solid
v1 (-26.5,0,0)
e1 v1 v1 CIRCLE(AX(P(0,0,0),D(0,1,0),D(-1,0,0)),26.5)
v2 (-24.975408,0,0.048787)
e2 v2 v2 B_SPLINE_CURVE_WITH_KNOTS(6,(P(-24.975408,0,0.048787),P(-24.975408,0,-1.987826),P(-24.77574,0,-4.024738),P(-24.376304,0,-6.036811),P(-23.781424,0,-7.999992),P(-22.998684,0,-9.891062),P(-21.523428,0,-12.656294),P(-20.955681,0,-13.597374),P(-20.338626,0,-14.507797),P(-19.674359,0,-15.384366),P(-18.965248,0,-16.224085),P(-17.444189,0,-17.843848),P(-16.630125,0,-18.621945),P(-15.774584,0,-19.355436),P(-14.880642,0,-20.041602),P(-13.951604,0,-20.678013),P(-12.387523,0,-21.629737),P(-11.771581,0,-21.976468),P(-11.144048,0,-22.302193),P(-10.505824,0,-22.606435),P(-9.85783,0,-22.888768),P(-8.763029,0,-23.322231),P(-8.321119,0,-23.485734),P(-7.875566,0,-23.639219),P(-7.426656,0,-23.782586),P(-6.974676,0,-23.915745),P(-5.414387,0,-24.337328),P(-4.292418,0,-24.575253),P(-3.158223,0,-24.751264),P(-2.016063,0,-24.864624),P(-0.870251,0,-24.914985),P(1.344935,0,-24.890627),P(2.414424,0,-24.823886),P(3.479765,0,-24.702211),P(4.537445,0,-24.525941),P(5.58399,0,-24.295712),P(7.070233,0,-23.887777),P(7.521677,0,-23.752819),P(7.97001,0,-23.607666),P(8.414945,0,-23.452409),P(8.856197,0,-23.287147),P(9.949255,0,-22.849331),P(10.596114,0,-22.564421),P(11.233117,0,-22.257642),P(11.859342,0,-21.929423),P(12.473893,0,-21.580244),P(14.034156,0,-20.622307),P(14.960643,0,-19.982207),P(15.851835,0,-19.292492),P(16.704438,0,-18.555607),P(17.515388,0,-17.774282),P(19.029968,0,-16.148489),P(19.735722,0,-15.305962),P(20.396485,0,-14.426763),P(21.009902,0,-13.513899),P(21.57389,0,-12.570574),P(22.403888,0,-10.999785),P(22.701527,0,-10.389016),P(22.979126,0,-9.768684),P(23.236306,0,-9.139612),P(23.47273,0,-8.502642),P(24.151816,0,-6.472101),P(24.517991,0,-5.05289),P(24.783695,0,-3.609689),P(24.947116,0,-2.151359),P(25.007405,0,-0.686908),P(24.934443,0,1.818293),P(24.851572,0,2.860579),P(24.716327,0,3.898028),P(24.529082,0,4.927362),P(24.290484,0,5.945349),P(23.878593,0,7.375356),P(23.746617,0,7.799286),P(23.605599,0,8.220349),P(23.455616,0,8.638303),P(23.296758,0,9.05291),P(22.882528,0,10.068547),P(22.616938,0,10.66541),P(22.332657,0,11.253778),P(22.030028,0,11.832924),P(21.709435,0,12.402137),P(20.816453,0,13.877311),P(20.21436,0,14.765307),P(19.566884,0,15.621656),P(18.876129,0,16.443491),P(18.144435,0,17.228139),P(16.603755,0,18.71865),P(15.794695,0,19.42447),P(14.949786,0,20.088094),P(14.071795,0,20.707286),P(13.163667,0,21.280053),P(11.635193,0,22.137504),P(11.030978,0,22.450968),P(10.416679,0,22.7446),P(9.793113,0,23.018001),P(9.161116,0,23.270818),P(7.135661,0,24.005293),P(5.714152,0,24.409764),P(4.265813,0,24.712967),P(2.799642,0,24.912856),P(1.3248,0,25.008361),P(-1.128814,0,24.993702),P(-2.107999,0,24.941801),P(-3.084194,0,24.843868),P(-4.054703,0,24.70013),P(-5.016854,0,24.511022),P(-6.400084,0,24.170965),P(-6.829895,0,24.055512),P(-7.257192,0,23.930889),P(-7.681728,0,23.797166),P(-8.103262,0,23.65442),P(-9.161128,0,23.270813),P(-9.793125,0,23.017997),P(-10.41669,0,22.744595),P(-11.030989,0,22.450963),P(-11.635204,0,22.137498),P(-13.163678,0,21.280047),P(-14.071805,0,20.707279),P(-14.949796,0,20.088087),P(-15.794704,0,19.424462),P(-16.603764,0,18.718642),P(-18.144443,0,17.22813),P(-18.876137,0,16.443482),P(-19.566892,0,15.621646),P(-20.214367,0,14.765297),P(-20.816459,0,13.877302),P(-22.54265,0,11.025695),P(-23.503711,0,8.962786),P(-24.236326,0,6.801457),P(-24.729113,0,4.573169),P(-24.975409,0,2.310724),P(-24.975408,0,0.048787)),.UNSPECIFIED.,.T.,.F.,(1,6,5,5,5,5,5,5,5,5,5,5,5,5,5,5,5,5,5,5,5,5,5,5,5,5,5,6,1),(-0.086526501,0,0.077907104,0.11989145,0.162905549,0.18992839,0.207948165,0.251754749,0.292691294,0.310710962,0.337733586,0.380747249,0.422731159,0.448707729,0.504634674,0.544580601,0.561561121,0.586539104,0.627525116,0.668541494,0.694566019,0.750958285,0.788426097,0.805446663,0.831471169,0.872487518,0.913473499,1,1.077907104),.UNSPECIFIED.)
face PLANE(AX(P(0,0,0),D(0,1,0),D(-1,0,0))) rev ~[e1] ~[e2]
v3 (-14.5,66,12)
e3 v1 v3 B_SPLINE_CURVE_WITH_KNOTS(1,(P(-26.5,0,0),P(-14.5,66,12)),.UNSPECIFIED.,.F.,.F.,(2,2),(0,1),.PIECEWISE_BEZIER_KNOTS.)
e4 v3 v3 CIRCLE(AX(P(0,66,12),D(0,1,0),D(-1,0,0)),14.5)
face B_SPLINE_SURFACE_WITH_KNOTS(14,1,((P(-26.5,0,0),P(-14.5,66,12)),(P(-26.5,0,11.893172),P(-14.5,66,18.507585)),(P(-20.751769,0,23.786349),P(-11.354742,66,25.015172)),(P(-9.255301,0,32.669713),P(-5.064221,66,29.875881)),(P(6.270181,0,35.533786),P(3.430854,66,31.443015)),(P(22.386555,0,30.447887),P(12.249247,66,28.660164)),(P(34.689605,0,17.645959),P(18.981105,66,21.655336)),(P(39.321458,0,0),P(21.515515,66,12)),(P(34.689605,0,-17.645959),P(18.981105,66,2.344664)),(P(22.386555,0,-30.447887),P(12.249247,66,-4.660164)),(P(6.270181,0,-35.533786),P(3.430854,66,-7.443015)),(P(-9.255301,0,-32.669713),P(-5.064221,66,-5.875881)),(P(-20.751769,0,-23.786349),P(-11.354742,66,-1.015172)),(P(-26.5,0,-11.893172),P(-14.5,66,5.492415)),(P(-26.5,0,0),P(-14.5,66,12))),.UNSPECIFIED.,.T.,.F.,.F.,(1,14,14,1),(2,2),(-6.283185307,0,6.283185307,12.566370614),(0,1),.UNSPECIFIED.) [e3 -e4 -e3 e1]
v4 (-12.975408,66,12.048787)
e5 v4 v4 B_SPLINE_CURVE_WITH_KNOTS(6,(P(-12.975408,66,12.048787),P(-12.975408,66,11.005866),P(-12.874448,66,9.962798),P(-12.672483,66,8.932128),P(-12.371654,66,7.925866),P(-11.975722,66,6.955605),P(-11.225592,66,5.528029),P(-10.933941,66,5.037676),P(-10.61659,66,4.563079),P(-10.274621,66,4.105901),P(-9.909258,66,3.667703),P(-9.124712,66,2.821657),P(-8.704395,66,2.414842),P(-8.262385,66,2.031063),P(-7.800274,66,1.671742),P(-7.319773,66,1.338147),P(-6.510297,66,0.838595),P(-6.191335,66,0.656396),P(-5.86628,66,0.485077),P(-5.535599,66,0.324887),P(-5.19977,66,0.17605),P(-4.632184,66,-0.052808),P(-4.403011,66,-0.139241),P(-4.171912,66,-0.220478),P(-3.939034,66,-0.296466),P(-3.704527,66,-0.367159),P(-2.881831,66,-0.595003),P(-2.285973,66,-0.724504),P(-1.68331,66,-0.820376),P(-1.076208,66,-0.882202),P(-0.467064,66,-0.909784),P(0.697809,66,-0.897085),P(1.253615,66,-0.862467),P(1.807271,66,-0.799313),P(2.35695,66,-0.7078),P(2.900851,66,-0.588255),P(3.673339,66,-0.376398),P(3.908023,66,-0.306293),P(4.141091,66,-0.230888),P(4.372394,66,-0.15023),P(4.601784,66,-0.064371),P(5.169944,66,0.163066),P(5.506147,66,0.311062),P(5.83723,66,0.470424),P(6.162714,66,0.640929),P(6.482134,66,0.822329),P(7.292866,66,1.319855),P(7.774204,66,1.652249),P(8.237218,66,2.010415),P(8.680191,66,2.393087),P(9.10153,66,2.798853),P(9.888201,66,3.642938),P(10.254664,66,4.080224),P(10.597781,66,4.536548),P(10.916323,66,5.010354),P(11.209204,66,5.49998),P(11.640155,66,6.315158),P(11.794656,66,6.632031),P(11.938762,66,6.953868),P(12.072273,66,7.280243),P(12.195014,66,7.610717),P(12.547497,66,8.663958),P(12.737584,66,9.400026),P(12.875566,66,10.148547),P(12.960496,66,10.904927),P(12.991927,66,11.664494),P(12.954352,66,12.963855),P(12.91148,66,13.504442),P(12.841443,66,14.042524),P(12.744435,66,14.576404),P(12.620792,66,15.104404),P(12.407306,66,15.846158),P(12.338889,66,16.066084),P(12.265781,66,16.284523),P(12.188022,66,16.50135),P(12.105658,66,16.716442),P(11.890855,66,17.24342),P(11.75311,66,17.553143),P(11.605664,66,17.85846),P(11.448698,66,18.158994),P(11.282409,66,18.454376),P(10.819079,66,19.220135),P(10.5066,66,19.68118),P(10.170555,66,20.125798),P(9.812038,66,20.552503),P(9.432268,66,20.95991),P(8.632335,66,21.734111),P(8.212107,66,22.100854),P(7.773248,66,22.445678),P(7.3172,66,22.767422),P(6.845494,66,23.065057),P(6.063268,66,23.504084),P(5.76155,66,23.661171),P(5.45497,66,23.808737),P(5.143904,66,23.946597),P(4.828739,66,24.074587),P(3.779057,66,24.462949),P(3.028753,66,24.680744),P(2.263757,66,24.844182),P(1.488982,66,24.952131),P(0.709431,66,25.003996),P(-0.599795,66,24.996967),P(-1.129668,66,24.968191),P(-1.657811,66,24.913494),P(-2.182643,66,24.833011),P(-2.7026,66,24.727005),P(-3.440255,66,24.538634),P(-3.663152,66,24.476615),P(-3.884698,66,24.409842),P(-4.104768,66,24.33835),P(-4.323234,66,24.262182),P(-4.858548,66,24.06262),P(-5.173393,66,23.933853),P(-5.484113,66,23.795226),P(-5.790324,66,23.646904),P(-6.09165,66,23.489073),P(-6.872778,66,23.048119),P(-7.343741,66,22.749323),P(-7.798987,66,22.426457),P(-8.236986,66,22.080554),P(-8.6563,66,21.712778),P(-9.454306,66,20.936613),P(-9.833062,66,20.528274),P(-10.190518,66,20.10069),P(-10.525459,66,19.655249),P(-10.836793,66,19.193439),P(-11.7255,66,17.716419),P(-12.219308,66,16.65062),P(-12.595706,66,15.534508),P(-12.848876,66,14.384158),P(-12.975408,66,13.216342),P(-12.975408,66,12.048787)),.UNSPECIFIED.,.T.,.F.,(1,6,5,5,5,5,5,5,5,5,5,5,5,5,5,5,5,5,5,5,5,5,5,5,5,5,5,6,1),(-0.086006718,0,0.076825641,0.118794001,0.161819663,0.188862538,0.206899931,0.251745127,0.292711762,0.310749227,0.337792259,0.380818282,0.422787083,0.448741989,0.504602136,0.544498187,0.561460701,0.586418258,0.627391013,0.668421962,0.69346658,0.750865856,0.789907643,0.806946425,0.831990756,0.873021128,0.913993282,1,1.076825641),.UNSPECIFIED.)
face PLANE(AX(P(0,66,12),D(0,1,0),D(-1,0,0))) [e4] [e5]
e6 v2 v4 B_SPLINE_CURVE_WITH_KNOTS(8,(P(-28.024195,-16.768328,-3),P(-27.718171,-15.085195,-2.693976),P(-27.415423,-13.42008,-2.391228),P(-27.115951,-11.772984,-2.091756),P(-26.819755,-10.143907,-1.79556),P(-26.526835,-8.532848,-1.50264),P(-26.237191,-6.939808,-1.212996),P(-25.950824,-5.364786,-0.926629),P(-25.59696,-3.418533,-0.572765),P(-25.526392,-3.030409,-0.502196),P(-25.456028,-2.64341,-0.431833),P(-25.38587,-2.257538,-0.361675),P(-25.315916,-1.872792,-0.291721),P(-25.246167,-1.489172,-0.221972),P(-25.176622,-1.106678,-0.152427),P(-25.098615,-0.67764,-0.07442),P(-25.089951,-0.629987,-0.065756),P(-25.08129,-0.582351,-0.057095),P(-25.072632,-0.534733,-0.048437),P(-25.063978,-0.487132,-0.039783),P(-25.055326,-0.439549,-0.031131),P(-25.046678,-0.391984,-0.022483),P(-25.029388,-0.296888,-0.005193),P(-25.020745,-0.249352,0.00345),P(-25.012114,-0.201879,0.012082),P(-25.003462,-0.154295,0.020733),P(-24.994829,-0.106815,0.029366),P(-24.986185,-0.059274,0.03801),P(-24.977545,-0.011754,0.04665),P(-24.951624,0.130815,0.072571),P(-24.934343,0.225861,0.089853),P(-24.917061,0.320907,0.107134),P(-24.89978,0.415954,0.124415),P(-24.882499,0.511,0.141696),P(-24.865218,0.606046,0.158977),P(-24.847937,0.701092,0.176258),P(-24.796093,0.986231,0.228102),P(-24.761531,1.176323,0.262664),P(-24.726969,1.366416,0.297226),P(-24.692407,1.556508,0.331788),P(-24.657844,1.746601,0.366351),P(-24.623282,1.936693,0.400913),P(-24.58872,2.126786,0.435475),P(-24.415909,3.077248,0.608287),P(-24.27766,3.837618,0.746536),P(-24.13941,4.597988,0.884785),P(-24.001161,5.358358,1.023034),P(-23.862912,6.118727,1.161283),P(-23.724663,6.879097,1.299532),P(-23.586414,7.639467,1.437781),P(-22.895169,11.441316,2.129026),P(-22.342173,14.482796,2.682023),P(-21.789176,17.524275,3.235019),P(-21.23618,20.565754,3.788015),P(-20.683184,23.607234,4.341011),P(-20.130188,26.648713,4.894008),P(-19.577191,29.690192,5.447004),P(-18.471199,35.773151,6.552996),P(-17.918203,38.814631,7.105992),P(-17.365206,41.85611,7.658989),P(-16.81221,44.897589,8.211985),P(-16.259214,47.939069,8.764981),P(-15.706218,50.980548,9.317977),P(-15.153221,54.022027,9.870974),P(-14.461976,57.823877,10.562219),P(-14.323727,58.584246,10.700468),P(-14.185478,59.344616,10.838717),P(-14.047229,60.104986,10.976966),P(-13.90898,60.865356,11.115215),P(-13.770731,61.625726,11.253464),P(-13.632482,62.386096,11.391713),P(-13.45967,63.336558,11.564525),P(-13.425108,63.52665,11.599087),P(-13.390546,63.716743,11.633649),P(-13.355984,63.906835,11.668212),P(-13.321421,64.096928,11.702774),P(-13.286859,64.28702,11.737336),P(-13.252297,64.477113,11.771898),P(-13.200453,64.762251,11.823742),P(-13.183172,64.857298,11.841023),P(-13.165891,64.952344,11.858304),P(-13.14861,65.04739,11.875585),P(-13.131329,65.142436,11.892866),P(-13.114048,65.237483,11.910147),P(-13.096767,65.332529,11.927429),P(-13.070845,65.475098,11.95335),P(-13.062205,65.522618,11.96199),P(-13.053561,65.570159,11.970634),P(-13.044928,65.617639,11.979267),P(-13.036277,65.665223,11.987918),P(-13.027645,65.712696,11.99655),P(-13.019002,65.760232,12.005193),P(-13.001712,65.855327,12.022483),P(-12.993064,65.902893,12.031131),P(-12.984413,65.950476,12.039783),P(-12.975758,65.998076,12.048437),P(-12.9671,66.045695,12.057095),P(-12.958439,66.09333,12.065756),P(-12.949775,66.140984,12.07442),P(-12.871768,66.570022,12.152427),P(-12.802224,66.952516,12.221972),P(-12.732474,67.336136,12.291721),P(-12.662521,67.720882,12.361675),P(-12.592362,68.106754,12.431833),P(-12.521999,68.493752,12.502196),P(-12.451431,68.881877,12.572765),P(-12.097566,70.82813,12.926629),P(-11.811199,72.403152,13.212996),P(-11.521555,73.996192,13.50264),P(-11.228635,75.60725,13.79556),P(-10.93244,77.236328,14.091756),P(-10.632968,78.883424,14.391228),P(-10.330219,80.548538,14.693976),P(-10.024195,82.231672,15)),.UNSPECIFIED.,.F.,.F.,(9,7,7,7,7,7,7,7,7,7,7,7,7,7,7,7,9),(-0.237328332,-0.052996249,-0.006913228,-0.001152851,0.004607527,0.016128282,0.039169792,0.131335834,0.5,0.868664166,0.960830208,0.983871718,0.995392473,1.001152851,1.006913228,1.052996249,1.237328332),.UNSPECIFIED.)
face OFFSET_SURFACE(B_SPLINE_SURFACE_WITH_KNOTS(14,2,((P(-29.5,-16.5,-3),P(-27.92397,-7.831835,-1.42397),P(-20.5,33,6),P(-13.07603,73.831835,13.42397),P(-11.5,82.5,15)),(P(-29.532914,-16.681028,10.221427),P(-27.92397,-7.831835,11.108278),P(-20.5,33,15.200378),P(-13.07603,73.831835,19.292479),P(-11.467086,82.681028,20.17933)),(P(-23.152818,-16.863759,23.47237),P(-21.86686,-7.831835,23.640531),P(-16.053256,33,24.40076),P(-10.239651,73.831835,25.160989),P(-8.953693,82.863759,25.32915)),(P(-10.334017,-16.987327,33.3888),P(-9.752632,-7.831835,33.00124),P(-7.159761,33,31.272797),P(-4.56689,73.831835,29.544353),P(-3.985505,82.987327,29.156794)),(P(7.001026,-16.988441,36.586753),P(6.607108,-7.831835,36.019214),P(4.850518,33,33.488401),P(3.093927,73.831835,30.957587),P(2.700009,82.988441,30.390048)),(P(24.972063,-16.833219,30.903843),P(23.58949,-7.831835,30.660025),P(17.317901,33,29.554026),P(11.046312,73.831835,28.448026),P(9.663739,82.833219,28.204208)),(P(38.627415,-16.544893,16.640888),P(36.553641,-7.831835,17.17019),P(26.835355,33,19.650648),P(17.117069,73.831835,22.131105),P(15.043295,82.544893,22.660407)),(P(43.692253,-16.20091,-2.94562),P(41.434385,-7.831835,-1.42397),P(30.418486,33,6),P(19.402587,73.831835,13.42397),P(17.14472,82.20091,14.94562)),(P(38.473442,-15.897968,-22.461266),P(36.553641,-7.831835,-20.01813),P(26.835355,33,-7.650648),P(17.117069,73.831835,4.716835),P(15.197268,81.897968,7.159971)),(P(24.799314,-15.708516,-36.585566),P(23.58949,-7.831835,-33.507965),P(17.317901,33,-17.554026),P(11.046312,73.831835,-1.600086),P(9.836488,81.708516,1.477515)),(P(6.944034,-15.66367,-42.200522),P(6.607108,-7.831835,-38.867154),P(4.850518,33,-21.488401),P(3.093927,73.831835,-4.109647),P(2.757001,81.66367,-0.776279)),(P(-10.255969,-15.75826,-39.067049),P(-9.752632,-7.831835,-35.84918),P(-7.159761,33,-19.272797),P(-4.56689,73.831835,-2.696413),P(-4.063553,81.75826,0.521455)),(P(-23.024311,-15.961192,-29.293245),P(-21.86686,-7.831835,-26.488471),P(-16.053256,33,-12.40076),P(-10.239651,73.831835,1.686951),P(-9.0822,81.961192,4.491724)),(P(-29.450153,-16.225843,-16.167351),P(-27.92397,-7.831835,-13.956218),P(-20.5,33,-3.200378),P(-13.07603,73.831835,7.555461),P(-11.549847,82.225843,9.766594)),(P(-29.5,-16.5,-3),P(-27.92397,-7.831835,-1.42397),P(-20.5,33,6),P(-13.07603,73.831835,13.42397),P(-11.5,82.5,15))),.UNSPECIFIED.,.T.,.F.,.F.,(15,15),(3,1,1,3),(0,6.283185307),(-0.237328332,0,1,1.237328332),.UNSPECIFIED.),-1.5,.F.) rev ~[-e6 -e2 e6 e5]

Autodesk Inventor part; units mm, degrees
ref_plane "YZ Plane" through (0, 0, 0) normal (1, 0, 0) x (0, 1, 0)
ref_plane "XY Plane" through (0, 0, 0) normal (0, 0, 1) x (1, 0, 0)
sketch "Szkic6" plane through (0, 0, 0) normal (0, 1, 0) x (-1, 0, 0)
  circle A0 centre (0, 0) radius 26.5
  dimension "d33" = 53
ref_plane "Płaszczyzna konstrukcyjna1" through (0, 66, 0) normal (0, 1, 0) x (-1, 0, 0)
sketch "Szkic7" plane through (0, 66, 0) normal (0, 1, 0) x (-1, 0, 0)
  circle A0 centre (0, 12) radius 14.5
  line L0 (0, -20.3) -> (0, 20.3) construction
  circle A1 centre (0, 0) radius 26.5 construction
  dimension "d35" = 29
loft "Wyciągnięcie złożone1" add profiles "Szkic6", "Szkic7"
shell "Skorupa1" thickness 1.5 removed faces 2 at (-3.2046, 66, 12.1978) at (-1.8199, 0, -2.5499)
equation "\"d33\" = OD1"
equation "\"d35\" = OD2"
equation "\"d52\" = THK"
equation "\"SzerokośćGięciaPodcięcia\" = Grubość"
equation "\"RozmiarPodcięciaNarożnika\" = 4 * Grubość"
equation "\"PromieńPrzejścia\" = PromieńGięcia"
equation "\"Rozmiar_promienia_Jacobiego\" = PromieńGięcia"
equation "\"Wielk_odstępu\" = Grubość"
equation "\"d2\" = PromieńGięcia"
equation "\"d23\" = PromieńGięcia"
equation "\"OD1\" = 53"
equation "\"OD2\" = 29"
equation "\"L\" = 66"
equation "\"THK\" = 1.5"
equation "\"d34\" = L"
equation "\"Grubość\" = 1.5"
equation "\"PromieńGięcia\" = 3"
properties part number "Redukcja asymetryczna Ø53x29x1,5 L=66" material "304"
